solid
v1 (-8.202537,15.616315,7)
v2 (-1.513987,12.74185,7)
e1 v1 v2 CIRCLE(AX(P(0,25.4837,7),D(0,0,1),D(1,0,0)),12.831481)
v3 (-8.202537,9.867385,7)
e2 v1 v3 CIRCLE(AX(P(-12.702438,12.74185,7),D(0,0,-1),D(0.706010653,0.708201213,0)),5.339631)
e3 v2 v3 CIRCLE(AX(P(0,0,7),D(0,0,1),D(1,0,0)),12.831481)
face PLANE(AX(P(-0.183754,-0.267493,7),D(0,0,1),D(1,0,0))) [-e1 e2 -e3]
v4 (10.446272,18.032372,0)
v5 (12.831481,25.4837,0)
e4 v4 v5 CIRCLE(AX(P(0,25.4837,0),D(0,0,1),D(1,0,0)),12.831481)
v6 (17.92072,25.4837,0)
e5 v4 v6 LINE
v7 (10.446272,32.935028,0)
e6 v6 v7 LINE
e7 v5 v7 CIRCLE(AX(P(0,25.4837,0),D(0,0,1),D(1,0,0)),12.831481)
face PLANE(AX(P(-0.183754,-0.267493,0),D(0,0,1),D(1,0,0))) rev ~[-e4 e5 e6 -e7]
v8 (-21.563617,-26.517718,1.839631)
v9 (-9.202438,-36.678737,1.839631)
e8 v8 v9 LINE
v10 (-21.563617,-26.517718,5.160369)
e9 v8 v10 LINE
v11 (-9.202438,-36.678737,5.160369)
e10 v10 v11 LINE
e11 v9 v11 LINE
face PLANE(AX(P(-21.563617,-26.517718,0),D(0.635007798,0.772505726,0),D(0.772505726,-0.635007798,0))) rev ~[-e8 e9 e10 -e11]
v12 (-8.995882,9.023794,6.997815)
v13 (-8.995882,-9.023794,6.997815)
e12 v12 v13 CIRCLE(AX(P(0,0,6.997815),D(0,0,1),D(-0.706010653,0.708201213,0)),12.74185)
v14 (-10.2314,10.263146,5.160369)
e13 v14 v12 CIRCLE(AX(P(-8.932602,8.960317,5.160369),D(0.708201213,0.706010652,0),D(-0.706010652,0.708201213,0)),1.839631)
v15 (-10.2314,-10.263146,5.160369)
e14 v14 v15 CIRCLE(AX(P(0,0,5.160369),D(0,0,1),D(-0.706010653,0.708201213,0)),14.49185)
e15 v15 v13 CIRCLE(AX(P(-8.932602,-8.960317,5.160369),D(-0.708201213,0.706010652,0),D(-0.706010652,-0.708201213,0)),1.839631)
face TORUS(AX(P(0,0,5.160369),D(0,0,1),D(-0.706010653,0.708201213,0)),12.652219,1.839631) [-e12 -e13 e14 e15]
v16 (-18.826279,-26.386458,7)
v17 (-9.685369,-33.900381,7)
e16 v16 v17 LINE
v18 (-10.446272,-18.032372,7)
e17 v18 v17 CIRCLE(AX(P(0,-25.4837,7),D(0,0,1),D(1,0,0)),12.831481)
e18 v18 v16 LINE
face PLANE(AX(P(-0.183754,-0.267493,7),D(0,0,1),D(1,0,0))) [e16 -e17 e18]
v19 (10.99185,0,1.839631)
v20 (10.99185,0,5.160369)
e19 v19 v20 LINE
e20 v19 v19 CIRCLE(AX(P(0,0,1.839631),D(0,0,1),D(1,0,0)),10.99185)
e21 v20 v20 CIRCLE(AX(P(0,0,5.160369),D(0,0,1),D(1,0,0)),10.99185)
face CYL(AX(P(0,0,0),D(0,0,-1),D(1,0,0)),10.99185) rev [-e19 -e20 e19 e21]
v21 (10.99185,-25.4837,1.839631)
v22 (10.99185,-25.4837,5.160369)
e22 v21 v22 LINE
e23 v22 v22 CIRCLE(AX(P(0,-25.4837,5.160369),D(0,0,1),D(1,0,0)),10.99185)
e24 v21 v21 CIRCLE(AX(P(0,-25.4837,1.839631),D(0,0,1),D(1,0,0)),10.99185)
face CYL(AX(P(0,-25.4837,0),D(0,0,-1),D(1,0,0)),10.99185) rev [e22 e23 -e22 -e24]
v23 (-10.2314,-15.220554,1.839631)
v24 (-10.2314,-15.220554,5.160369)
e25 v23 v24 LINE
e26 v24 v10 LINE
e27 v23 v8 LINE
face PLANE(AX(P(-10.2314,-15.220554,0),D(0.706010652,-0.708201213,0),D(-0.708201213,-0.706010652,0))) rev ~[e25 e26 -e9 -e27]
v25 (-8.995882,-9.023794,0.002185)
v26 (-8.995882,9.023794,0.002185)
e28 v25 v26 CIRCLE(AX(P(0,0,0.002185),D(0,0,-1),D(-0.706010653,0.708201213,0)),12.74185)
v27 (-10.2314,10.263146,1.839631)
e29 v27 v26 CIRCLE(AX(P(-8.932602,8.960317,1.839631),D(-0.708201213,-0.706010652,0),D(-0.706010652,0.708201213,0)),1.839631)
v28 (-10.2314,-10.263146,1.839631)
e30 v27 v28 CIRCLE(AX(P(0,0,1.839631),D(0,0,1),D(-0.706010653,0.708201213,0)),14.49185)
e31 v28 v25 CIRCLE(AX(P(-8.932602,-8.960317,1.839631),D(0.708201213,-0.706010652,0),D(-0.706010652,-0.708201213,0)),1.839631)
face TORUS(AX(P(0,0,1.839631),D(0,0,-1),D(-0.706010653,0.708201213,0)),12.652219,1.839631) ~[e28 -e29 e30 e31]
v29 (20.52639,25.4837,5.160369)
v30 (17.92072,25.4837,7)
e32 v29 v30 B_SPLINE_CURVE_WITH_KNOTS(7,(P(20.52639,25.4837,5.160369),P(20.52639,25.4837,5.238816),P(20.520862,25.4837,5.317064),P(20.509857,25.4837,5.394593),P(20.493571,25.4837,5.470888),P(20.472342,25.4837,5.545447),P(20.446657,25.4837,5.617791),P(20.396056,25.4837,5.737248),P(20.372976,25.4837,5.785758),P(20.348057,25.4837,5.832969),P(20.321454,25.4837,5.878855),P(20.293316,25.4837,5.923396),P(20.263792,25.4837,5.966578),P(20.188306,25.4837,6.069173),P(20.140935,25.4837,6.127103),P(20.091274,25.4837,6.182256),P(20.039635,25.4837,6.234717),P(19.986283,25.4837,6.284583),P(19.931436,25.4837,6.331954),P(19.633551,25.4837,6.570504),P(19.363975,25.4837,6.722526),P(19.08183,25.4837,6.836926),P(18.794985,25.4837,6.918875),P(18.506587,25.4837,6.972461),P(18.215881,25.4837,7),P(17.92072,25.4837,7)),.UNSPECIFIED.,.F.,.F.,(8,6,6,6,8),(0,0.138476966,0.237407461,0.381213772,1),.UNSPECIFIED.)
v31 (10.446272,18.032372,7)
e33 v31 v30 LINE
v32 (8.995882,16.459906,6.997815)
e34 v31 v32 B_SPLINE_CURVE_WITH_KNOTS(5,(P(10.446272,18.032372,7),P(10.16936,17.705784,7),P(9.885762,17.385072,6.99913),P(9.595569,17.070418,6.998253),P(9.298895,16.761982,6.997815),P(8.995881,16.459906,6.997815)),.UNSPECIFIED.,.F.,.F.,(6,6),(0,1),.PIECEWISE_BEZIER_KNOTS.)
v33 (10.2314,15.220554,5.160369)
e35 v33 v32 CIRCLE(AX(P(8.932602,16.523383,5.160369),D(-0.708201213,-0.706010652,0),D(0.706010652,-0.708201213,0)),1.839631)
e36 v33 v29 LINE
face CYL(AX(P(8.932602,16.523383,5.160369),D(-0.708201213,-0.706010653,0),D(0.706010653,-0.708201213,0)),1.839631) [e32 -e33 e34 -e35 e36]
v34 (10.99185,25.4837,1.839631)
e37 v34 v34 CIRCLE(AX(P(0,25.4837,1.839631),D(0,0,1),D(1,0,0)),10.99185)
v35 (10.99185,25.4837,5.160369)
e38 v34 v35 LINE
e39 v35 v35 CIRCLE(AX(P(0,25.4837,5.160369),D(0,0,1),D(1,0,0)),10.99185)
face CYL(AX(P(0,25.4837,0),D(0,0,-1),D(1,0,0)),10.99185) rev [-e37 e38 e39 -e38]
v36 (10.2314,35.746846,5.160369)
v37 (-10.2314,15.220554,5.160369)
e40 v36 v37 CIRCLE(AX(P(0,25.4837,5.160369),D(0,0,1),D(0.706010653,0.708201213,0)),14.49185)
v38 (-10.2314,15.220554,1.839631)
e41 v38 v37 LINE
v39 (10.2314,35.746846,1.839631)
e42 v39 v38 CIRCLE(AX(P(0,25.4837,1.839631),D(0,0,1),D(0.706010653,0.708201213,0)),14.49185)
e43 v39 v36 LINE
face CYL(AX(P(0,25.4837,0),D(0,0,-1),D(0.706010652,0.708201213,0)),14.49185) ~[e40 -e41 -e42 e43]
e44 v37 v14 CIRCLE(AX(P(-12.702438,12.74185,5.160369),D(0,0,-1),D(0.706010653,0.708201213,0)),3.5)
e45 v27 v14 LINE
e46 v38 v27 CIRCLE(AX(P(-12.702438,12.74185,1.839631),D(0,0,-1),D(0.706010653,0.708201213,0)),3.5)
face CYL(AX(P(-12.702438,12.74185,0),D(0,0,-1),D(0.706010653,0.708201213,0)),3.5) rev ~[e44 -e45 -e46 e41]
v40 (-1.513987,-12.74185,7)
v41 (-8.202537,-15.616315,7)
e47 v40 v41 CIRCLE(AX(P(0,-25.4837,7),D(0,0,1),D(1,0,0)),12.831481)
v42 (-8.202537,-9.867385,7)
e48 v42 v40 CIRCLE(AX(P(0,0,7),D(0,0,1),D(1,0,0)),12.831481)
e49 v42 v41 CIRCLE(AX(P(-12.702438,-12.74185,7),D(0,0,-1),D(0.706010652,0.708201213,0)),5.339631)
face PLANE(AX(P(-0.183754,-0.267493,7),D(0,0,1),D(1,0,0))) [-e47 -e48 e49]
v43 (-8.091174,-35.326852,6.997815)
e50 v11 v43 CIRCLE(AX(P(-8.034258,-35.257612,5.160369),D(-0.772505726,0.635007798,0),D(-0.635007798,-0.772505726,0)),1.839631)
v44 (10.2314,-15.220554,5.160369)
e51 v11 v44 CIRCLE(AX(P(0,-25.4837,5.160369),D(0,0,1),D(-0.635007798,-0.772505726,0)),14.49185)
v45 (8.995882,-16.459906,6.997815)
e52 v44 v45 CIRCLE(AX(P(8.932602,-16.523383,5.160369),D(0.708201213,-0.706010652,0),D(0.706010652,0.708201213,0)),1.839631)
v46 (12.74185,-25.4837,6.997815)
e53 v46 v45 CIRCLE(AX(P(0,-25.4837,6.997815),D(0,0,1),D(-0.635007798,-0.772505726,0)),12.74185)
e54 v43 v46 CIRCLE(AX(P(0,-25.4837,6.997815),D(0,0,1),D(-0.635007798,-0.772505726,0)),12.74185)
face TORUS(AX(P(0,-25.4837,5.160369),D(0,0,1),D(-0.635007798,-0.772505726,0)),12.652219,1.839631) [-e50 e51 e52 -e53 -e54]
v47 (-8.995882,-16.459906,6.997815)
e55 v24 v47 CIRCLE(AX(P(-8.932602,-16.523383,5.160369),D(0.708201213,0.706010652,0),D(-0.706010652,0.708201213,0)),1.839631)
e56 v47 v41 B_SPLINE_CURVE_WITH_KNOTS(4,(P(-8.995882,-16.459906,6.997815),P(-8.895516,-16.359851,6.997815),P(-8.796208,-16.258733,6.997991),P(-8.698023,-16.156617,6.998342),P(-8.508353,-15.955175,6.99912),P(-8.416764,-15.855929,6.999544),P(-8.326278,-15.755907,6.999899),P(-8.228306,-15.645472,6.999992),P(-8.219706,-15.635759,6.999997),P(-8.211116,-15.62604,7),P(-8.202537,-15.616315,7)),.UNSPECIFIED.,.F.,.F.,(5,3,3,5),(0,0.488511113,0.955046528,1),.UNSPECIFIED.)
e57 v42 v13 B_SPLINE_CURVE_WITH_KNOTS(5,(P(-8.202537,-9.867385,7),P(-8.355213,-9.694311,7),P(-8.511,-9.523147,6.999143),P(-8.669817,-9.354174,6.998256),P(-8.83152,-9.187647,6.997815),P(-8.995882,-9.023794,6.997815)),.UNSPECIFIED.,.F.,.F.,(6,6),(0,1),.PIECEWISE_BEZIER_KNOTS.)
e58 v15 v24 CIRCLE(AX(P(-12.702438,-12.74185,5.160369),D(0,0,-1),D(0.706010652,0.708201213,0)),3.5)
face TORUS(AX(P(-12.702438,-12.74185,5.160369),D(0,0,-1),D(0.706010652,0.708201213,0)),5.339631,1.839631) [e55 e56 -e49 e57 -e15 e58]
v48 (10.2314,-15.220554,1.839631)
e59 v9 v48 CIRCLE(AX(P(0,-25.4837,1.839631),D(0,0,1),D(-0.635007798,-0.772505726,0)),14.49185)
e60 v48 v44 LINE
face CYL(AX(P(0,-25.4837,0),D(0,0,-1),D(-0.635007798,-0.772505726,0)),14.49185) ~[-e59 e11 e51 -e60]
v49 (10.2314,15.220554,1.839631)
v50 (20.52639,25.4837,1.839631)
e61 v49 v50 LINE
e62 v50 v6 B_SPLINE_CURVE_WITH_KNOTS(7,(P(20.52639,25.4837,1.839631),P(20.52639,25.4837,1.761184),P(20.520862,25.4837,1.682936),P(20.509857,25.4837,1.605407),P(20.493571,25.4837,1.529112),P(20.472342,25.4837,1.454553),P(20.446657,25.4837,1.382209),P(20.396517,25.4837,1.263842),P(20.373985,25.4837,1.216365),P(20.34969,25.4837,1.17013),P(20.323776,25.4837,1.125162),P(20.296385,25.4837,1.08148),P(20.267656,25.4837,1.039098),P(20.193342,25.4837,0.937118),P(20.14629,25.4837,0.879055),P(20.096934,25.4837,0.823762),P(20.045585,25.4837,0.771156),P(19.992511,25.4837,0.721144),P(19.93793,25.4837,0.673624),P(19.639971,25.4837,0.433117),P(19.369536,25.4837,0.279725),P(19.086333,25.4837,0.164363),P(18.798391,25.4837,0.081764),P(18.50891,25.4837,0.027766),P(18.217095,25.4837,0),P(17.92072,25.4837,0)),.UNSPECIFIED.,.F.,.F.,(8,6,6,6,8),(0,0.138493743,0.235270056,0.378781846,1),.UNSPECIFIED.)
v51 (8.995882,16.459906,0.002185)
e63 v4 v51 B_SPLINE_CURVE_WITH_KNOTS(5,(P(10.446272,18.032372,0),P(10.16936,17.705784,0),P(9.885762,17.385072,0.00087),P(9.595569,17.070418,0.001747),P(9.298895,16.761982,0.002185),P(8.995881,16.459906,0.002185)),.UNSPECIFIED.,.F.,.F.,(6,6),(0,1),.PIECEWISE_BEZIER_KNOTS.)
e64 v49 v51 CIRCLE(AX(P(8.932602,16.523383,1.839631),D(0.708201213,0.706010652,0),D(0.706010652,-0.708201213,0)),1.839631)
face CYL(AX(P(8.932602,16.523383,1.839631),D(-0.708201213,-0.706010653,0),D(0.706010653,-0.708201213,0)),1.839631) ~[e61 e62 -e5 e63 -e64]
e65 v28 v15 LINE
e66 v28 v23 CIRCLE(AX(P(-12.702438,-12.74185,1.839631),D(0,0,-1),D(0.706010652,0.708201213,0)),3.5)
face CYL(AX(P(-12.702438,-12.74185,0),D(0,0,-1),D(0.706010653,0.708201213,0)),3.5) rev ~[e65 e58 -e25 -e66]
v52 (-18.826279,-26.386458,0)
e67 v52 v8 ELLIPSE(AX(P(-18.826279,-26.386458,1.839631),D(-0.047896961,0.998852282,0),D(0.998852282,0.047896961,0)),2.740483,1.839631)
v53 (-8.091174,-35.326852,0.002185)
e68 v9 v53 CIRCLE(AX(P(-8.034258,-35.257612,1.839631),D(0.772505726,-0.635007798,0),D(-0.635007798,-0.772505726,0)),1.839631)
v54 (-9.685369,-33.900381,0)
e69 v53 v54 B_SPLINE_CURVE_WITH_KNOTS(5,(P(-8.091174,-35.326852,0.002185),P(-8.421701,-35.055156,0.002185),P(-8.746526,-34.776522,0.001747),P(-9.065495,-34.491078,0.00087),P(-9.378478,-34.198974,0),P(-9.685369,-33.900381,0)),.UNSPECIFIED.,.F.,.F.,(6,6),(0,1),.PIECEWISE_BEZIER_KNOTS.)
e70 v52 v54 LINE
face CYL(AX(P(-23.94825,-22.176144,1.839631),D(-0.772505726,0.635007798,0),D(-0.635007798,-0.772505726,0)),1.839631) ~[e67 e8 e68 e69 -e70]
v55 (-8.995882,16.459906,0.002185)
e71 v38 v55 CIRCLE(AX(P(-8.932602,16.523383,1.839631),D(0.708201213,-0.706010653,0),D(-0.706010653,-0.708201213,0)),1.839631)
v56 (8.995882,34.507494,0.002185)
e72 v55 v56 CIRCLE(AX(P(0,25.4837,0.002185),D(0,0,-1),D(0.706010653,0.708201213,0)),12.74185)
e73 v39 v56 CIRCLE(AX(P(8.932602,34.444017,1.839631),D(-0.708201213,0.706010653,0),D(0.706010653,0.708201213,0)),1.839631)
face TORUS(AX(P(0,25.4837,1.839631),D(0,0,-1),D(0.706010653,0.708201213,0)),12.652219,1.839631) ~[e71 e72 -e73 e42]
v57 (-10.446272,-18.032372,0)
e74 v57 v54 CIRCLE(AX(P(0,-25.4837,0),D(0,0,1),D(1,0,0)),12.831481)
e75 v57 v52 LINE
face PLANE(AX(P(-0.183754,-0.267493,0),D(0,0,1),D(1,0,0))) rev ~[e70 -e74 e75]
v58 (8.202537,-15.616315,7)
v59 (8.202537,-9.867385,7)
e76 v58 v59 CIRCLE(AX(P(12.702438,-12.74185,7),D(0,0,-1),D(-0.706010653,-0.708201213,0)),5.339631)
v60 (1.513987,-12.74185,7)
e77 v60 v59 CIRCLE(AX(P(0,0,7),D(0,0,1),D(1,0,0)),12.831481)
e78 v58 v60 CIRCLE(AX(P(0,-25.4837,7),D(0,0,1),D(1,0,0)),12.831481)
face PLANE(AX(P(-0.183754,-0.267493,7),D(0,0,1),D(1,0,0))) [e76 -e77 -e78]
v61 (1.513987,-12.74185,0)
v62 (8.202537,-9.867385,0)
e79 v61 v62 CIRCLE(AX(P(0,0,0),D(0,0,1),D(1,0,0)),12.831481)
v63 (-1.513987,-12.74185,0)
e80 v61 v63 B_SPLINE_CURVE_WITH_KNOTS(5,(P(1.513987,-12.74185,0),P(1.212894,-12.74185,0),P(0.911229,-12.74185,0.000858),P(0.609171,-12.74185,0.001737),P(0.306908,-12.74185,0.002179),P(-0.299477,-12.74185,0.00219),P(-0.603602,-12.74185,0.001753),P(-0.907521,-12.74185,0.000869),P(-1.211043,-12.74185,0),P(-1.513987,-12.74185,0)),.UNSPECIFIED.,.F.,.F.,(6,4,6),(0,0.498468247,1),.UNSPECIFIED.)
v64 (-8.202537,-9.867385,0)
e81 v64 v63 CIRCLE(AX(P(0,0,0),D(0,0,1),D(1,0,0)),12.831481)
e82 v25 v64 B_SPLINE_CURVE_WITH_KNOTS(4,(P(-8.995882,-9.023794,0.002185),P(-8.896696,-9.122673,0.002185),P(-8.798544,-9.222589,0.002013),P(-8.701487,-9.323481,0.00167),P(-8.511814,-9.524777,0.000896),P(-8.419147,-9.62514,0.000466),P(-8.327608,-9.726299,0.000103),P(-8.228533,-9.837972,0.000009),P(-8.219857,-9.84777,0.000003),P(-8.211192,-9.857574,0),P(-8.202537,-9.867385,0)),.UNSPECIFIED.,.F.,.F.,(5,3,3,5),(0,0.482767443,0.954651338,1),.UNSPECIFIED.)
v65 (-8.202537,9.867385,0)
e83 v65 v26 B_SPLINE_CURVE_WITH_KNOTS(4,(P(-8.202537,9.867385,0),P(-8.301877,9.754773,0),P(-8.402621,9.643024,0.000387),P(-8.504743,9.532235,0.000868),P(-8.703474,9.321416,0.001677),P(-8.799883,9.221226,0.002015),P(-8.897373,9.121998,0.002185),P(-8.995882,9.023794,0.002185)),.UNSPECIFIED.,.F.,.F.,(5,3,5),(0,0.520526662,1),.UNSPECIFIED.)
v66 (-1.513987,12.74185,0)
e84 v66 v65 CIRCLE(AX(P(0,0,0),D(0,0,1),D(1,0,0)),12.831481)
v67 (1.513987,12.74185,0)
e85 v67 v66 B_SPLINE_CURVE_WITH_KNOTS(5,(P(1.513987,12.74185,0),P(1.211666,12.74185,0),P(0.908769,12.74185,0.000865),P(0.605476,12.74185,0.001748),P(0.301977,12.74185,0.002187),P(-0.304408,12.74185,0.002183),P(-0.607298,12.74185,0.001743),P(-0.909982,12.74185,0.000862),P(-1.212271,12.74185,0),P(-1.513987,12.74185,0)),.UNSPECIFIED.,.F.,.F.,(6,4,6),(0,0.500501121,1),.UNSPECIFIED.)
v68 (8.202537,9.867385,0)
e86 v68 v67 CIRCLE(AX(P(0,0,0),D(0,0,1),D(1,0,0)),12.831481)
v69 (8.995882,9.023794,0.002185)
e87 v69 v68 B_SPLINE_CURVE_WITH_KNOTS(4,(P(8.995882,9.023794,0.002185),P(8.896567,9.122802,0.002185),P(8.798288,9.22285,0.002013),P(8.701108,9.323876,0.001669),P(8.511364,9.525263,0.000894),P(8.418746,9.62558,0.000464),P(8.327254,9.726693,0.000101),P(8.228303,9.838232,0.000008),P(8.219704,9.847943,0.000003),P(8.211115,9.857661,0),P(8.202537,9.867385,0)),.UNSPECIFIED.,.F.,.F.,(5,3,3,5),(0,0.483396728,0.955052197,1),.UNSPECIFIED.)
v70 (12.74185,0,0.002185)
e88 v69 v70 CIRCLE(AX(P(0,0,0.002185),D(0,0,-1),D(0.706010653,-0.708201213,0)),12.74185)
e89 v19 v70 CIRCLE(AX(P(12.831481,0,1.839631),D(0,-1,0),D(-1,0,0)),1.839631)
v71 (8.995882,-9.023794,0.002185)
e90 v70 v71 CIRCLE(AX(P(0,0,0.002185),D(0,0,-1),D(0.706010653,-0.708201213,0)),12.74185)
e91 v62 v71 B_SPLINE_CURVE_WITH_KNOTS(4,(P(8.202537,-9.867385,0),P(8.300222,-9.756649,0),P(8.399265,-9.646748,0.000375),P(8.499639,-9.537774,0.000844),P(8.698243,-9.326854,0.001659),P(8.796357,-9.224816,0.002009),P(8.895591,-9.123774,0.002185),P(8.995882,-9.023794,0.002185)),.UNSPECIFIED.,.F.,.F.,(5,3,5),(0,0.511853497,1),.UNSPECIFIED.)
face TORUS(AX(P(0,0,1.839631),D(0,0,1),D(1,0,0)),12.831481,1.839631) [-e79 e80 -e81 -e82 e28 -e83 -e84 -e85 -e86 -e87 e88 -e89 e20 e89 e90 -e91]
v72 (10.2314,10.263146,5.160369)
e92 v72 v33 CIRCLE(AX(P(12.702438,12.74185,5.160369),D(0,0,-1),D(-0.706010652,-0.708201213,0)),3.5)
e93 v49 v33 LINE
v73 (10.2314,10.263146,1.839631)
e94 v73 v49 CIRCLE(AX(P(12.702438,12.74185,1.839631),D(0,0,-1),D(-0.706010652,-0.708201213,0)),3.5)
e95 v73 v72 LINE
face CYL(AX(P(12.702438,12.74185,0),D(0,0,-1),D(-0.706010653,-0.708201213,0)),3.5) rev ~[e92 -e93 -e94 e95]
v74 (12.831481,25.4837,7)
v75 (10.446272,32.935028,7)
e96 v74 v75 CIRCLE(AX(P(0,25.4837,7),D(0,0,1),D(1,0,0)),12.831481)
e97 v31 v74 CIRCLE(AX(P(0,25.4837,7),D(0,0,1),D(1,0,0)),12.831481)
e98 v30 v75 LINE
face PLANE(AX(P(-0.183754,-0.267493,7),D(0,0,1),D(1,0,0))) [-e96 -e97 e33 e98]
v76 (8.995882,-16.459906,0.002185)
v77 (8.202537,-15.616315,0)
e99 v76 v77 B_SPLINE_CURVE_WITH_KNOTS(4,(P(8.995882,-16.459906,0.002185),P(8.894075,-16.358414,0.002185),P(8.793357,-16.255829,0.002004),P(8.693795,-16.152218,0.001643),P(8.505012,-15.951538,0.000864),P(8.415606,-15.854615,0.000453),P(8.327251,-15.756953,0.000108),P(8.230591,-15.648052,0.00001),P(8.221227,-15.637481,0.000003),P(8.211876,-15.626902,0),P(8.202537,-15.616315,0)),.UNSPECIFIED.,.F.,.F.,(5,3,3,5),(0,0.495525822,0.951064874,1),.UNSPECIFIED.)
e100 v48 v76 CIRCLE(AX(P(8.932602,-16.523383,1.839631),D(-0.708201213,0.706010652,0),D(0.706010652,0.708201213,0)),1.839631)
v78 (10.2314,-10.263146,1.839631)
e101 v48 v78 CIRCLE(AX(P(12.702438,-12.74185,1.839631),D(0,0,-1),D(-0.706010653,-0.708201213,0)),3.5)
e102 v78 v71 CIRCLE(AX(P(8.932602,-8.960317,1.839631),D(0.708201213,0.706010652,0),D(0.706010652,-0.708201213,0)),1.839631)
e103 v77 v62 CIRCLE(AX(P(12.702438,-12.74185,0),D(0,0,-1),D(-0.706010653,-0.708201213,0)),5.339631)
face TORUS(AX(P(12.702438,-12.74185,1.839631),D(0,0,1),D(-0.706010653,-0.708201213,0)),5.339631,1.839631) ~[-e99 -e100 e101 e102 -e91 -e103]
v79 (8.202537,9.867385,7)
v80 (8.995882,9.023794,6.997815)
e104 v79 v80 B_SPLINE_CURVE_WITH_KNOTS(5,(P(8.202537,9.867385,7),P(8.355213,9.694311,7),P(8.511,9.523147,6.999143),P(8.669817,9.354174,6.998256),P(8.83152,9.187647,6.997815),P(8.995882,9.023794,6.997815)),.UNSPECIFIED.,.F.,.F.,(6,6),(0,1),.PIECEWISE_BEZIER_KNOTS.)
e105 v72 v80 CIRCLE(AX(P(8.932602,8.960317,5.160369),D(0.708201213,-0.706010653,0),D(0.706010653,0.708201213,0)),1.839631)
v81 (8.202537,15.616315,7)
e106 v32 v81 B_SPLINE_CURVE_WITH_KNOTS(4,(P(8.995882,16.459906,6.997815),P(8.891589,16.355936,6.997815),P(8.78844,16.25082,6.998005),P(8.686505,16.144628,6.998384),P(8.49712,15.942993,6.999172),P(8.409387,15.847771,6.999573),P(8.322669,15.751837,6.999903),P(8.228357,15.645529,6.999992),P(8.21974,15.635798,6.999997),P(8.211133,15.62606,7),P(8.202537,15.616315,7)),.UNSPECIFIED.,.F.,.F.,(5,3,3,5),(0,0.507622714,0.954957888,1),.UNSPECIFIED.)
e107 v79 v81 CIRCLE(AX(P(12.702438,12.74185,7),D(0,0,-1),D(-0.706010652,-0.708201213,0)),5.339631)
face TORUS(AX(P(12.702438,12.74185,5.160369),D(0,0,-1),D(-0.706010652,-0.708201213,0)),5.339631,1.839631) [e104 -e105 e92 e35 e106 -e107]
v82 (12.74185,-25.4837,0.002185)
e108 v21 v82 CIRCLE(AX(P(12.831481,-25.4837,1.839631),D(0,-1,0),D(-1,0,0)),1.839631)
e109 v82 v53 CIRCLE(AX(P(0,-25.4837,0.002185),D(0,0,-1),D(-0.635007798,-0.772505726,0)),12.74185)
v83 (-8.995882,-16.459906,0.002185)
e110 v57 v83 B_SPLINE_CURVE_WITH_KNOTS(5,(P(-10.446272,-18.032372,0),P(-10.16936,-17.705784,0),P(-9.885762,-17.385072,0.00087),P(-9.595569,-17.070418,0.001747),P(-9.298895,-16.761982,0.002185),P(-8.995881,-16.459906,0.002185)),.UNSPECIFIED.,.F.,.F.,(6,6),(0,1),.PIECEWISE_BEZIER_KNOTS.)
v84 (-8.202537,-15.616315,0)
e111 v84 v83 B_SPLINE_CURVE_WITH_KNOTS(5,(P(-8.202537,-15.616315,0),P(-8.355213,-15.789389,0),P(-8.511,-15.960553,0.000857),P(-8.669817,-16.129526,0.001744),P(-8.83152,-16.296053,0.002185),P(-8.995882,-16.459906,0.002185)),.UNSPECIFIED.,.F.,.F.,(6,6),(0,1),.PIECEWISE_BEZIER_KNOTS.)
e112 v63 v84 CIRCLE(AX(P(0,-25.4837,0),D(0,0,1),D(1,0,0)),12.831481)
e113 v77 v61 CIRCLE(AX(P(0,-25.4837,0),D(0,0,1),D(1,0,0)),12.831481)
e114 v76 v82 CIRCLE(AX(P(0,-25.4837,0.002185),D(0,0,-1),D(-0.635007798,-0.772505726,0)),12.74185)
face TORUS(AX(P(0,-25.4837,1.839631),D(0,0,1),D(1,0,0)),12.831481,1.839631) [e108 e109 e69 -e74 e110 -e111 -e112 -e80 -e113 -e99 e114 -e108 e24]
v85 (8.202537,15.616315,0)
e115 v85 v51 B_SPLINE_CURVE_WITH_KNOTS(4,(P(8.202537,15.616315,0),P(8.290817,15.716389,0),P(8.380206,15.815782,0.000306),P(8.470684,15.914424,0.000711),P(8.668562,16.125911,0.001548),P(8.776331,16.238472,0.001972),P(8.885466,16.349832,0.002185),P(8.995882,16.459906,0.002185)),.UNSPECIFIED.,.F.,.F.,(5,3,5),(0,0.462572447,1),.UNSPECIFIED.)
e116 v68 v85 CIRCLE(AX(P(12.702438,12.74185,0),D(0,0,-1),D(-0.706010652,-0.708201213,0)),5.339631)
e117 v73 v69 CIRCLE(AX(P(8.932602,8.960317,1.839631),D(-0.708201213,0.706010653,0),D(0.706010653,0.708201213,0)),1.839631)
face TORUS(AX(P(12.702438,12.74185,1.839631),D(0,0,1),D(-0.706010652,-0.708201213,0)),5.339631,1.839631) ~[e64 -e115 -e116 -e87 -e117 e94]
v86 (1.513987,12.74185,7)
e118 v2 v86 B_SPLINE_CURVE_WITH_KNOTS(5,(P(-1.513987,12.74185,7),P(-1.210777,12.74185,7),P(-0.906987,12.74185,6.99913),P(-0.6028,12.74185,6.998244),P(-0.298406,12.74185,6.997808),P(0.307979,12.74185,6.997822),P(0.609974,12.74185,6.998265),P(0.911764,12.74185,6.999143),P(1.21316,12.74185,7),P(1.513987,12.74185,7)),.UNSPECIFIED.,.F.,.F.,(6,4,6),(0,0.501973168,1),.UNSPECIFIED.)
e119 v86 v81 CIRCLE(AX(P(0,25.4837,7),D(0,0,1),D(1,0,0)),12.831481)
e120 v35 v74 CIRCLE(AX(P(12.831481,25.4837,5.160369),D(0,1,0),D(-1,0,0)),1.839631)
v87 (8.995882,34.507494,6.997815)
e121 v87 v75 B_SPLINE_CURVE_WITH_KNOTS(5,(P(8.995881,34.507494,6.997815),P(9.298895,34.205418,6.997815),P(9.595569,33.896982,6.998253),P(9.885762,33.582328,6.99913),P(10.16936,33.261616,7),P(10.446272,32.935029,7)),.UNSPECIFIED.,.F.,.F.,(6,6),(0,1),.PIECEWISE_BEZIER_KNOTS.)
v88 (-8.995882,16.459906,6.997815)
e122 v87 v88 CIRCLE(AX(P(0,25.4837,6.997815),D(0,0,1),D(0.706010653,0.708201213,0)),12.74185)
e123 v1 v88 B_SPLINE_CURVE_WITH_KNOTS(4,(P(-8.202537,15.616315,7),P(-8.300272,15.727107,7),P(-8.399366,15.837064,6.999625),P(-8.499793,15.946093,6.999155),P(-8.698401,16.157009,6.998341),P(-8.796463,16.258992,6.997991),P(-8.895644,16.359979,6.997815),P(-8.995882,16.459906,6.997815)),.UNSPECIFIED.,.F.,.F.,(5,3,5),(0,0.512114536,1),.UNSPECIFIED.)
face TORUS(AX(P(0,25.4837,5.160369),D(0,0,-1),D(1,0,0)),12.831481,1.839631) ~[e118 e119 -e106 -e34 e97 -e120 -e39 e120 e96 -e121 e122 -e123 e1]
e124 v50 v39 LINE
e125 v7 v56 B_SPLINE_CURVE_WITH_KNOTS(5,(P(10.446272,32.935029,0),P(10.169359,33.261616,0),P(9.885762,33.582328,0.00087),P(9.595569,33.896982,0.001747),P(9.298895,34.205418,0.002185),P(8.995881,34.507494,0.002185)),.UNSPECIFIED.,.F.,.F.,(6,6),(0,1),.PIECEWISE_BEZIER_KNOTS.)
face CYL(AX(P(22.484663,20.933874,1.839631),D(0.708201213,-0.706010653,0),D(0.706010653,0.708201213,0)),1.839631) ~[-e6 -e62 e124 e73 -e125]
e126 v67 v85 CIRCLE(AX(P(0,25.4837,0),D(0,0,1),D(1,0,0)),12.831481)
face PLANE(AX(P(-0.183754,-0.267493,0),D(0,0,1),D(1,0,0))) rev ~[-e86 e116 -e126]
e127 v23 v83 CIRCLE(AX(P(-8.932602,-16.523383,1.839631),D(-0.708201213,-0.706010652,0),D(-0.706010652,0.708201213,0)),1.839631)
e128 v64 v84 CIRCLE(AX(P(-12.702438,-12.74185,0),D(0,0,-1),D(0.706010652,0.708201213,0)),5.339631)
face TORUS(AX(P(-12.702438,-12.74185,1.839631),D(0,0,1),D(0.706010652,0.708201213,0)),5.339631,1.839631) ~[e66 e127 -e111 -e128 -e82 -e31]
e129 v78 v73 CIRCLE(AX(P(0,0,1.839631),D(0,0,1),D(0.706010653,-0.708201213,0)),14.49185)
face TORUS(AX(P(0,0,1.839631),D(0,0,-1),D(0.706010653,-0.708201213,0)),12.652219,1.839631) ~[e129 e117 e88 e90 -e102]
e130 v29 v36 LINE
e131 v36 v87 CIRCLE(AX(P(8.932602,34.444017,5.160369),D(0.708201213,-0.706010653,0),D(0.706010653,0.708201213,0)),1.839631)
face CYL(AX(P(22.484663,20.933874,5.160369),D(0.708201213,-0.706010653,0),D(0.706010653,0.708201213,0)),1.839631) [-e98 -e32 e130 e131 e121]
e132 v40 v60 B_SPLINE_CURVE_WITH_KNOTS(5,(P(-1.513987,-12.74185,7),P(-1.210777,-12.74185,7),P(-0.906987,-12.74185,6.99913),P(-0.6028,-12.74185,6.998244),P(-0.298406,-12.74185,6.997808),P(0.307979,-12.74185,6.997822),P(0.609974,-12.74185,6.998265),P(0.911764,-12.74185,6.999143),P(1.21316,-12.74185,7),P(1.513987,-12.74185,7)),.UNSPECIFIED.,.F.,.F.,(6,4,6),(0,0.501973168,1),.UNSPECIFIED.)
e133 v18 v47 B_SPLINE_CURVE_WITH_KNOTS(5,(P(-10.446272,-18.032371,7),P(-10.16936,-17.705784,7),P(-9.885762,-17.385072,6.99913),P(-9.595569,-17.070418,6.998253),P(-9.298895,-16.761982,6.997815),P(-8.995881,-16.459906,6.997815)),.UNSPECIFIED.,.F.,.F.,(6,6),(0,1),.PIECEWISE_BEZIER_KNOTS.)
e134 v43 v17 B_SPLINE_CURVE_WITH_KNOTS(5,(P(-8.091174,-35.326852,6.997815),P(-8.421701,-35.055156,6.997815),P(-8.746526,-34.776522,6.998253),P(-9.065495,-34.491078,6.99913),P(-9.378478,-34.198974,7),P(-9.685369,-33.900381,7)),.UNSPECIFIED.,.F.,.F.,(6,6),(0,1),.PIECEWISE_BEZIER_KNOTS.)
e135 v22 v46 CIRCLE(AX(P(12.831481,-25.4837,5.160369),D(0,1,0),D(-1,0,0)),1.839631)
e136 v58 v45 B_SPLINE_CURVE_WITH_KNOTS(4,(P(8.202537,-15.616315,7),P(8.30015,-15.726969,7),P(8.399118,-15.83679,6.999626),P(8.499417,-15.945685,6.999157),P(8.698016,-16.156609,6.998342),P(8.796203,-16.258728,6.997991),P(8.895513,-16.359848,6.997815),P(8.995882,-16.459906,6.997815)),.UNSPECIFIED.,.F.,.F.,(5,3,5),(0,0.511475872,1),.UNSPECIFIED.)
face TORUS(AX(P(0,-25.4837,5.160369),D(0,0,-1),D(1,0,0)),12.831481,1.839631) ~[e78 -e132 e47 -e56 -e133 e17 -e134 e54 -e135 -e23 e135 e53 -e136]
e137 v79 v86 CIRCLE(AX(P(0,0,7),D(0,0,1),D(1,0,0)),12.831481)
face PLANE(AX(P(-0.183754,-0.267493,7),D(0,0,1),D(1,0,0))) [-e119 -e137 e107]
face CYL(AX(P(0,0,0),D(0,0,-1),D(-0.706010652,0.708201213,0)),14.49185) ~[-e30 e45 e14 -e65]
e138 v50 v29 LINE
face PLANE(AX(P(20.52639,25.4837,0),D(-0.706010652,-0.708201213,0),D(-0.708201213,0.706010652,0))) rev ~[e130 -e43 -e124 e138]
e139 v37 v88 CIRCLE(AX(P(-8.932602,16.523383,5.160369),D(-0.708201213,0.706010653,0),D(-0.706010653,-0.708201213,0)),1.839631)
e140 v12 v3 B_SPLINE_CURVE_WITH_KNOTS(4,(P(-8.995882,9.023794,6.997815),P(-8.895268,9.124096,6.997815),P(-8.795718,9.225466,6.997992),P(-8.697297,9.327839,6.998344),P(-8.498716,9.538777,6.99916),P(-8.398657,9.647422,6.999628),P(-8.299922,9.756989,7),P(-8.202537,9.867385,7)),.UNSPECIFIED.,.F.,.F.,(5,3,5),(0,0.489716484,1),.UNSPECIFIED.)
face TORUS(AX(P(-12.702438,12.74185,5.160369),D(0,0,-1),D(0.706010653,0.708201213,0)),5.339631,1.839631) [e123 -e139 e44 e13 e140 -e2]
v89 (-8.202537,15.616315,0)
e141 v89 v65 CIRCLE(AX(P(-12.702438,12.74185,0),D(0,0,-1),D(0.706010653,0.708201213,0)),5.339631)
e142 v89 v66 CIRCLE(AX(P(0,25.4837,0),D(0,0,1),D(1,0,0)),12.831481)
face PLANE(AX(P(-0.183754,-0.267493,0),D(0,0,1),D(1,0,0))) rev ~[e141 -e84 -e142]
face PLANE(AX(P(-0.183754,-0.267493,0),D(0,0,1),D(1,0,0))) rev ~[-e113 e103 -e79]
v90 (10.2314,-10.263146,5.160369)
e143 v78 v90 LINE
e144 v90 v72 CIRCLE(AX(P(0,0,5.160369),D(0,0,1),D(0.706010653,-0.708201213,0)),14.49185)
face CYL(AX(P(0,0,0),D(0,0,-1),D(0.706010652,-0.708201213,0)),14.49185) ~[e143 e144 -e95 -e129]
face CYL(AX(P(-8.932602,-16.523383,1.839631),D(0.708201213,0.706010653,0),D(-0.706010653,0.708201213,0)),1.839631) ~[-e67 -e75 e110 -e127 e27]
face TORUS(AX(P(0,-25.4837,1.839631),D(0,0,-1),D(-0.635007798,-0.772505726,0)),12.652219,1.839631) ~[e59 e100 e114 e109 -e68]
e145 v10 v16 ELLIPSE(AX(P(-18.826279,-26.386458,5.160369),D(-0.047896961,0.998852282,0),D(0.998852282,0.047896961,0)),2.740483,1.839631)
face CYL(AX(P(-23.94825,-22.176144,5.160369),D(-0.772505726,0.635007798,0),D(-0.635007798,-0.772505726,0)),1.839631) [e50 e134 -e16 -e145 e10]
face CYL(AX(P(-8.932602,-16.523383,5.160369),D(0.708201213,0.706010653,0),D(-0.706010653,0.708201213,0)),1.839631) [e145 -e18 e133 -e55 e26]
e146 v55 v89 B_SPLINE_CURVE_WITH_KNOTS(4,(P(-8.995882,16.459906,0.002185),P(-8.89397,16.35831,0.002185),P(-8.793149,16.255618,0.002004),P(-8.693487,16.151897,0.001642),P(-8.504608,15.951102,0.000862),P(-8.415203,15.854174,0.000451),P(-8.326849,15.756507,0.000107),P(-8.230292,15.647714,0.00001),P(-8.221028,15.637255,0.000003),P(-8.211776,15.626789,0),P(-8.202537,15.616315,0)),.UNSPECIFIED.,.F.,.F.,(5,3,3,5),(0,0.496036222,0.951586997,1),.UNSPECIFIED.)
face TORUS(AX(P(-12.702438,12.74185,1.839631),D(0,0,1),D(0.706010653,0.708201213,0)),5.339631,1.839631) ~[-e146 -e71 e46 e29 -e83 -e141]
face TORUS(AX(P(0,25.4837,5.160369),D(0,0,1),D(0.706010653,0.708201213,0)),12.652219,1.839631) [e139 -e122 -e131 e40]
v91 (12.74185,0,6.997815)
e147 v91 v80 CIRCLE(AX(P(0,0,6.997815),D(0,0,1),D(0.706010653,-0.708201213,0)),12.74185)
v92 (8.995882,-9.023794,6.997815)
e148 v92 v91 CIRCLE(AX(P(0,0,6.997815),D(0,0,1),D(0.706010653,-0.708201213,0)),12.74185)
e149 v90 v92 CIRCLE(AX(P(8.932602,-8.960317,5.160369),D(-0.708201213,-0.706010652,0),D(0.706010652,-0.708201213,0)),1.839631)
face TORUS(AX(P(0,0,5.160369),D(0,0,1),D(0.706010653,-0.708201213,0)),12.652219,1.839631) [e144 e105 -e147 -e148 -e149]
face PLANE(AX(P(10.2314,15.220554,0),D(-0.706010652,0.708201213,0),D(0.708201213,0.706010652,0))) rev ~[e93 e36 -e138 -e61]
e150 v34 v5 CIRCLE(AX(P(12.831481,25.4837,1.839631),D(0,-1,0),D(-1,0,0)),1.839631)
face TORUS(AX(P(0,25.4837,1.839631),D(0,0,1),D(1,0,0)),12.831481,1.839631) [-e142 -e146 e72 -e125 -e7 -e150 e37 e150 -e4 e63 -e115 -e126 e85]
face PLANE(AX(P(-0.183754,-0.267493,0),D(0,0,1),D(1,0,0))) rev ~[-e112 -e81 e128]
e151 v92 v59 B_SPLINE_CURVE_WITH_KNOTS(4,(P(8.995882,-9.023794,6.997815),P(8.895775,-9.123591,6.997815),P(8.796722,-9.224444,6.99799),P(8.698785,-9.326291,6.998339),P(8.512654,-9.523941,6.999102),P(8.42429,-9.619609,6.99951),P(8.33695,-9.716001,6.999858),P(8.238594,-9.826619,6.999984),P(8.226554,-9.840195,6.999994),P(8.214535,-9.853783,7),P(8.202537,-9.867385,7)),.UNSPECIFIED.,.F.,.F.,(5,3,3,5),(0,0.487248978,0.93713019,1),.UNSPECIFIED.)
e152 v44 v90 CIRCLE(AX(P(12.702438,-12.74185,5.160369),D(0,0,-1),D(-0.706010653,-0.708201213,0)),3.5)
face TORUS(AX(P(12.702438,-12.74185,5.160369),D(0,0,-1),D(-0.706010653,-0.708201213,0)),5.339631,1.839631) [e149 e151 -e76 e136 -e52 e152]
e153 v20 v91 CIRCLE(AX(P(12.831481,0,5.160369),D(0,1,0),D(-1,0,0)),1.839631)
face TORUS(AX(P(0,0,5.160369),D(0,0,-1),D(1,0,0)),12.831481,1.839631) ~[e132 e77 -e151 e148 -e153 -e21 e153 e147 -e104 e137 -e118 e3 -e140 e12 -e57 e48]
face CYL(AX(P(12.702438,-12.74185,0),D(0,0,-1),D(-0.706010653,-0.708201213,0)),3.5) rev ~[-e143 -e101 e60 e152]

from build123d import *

# Parameters (mm, degrees)
F1_R         = 10.99185
F2_DEPTH     = 7
F3_T3_ANGLE  = 174.5093117662
F3_T6_ANGLE  = 90.1774978599
F3_T9_DEPTH  = 19.1358911422
F3_T12_DEPTH = 19.1358911422
F3_T15_ANGLE = 180
F3_T18_ANGLE = 90.1774978599
F3_T21_ANGLE = 90.1774978599
F3_T24_ANGLE = 90.1774978599
F3_T27_DEPTH = 20.6004844584
F3_T30_DEPTH = 20.6004844584
F3_T33_ANGLE = 90.1774978599
F3_T36_ANGLE = 90.1774978599
F3_T48_ANGLE = 90.1774978599
F3_T51_DEPTH = 19.1358911422
F3_T54_DEPTH = 19.1358911422
F3_T57_ANGLE = 180
F3_T60_ANGLE = 90.1774978599
F3_T63_ANGLE = 90.1774978599
F3_T66_ANGLE = 90.1774978599
F3_T69_DEPTH = 20.6004844584
F3_T72_DEPTH = 20.6004844584
F3_T75_ANGLE = 174.5093117662
F3_T78_ANGLE = 90.1774978599
F3_T81_ANGLE = 90.1774978599


# Not quite as in the source:
# - a fillet or chamfer that OpenCascade refuses, or shapes differently, is made with other operations: its cross-section is extruded or revolved along the edge and cut away or added


with BuildPart() as f2:
    # F1 (on Top) → F2 (new body)
    with BuildSketch(Plane.XY):
        with BuildLine():
            Line((20.5263900038, 25.4837), (10.2314004744, 35.7468457534))
            ThreePointArc((10.2314004744, 35.7468457534), (-10.2631457534, 35.7151004744), (-10.2314004744, 15.2205542466))
            ThreePointArc((-10.2314004744, 15.2205542466), (-9.2024377582, 12.74185), (-10.2314004744, 10.2631457534))
            ThreePointArc((-10.2314004744, 10.2631457534), (-14.49185, 0), (-10.2314004744, -10.2631457534))
            ThreePointArc((-10.2314004744, -10.2631457534), (-9.2024377582, -12.74185), (-10.2314004744, -15.2205542466))
            Line((-10.2314004744, -15.2205542466), (-21.5636167673, -26.5177184828))
            Line((-21.5636167673, -26.5177184828), (-9.2024377582, -36.6787371026))
            ThreePointArc((-9.2024377582, -36.6787371026), (10.7414195495, -35.2117842145), (10.2314004744, -15.2205542466))
            ThreePointArc((10.2314004744, -15.2205542466), (9.2024377582, -12.74185), (10.2314004744, -10.2631457534))
            ThreePointArc((10.2314004744, -10.2631457534), (14.49185, 0), (10.2314004744, 10.2631457534))
            ThreePointArc((10.2314004744, 10.2631457534), (9.2024377582, 12.74185), (10.2314004744, 15.2205542466))
            Line((10.2314004744, 15.2205542466), (20.5263900038, 25.4837))
        make_face()
        with Locations((0, -25.4837)):
            Circle(F1_R, mode=Mode.SUBTRACT)
        Circle(F1_R, mode=Mode.SUBTRACT)
        with Locations((0, 25.4837)):
            Circle(F1_R, mode=Mode.SUBTRACT)
    extrude(amount=F2_DEPTH)

    # F3: fillet of radius 1.8396307345 on 30 edges, made by hand


with BuildPart() as f3_tool1:
    # F3_s2 → F3_t3 (revolve)
    with BuildSketch(Plane(origin=(12.5009566595, -10.2759173125, 0), x_dir=(0, 0, 1), z_dir=(-0.7725057258, 0.635007798, 0))):
        with BuildLine():
            ThreePointArc((5.1603692655, -34.1781541649), (6.4611846327, -33.6393387977), (7, -32.3385234304))
            Line((7, -32.3385234304), (7, -34.1781541649))
            Line((7, -34.1781541649), (5.1603692655, -34.1781541649))
        make_face()
    revolve(axis=Axis((0, -25.4837, 7), (0, 0, 1)), revolution_arc=F3_T3_ANGLE)


with BuildPart() as f3_tool4:
    # F3_s5 → F3_t6 (revolve)
    with BuildSketch(Plane(origin=(0, 0, 0), x_dir=(0, 0, 1), z_dir=(0.7082012133, -0.7060106525, 0))):
        with BuildLine():
            ThreePointArc((5.1603692655, -14.49185), (6.4611846327, -13.9530346327), (7, -12.6522192655))
            Line((7, -12.6522192655), (7, -14.49185))
            Line((7, -14.49185), (5.1603692655, -14.49185))
        make_face()
    revolve(axis=Axis((12.7024377582, 12.74185, 7), (0, 0, -1)), revolution_arc=F3_T6_ANGLE)


with BuildPart() as f3_tool7:
    # F3_s8 → F3_t9 (new body)
    with BuildSketch(Plane(origin=(12.7417888575, 12.7023768048, 0), x_dir=(0, 0, 1), z_dir=(0.7082012133, 0.7060106525, 0))):
        with BuildLine():
            ThreePointArc((5.1603692655, -3.5557372601), (6.4611846327, -4.0945526273), (7, -5.3953679946))
            Line((7, -5.3953679946), (7, -3.5557372601))
            Line((7, -3.5557372601), (5.1603692655, -3.5557372601))
        make_face()
    extrude(amount=F3_T9_DEPTH)


with BuildPart() as f3_tool10:
    # F3_s11 → F3_t12 (new body)
    with BuildSketch(Plane(origin=(0.8102724675, -0.8077661867, 0), x_dir=(0, 0, 1), z_dir=(-0.7082012133, 0.7060106525, 0))):
        with BuildLine():
            ThreePointArc((5.1603692655, 32.5394372601), (6.4611846327, 32.0006218928), (7, 30.6998065255))
            Line((7, 30.6998065255), (7, 32.5394372601))
            Line((7, 32.5394372601), (5.1603692655, 32.5394372601))
        make_face()
    extrude(amount=F3_T12_DEPTH)


with BuildPart() as f3_tool13:
    # F3_s14 → F3_t15 (revolve)
    with BuildSketch(Plane(origin=(-12.7417888575, 12.7023768048, 0), x_dir=(0, 0, 1), z_dir=(0.7082012133, -0.7060106525, 0))):
        with BuildLine():
            ThreePointArc((5.1603692655, -32.5394372601), (6.4611846327, -32.0006218928), (7, -30.6998065255))
            Line((7, -30.6998065255), (7, -32.5394372601))
            Line((7, -32.5394372601), (5.1603692655, -32.5394372601))
        make_face()
    revolve(axis=Axis((0, 25.4837, 7), (0, 0, 1)), revolution_arc=F3_T15_ANGLE)


with BuildPart() as f3_tool16:
    # F3_s17 → F3_t18 (revolve)
    with BuildSketch(Plane(origin=(-12.7417888575, 12.7023768048, 0), x_dir=(0, 0, 1), z_dir=(-0.7082012133, 0.7060106525, 0))):
        with BuildLine():
            ThreePointArc((5.1603692655, 3.5557372601), (6.4611846327, 4.0945526273), (7, 5.3953679946))
            Line((7, 5.3953679946), (7, 3.5557372601))
            Line((7, 3.5557372601), (5.1603692655, 3.5557372601))
        make_face()
    revolve(axis=Axis((-12.7024377582, 12.74185, 7), (0, 0, -1)), revolution_arc=F3_T18_ANGLE)


with BuildPart() as f3_tool19:
    # F3_s20 → F3_t21 (revolve)
    with BuildSketch(Plane(origin=(0, 0, 0), x_dir=(0, 0, 1), z_dir=(0.7082012133, 0.7060106525, 0))):
        with BuildLine():
            ThreePointArc((5.1603692655, -14.49185), (6.4611846327, -13.9530346327), (7, -12.6522192655))
            Line((7, -12.6522192655), (7, -14.49185))
            Line((7, -14.49185), (5.1603692655, -14.49185))
        make_face()
    revolve(axis=Axis((0, 0, 7), (0, 0, 1)), revolution_arc=F3_T21_ANGLE)


with BuildPart() as f3_tool22:
    # F3_s23 → F3_t24 (revolve)
    with BuildSketch(Plane(origin=(0, 0, 0), x_dir=(0, 0, 1), z_dir=(-0.7082012133, 0.7060106525, 0))):
        with BuildLine():
            ThreePointArc((5.1603692655, -14.49185), (6.4611846327, -13.9530346327), (7, -12.6522192655))
            Line((7, -12.6522192655), (7, -14.49185))
            Line((7, -14.49185), (5.1603692655, -14.49185))
        make_face()
    revolve(axis=Axis((-12.7024377582, -12.74185, 7), (0, 0, -1)), revolution_arc=F3_T24_ANGLE)


with BuildPart() as f3_tool25:
    # F3_s26 → F3_t27 (new body)
    with BuildSketch(Plane(origin=(-12.7417888575, -12.7023768048, 0), x_dir=(0, 0, 1), z_dir=(-0.7082012133, -0.7060106525, 0))):
        with BuildLine():
            ThreePointArc((5.1603692655, -3.5557372601), (6.4611846327, -4.0945526273), (7, -5.3953679946))
            Line((7, -5.3953679946), (7, -3.5557372601))
            Line((7, -3.5557372601), (5.1603692655, -3.5557372601))
        make_face()
    extrude(amount=F3_T27_DEPTH)


with BuildPart() as f3_tool28:
    # F3_s29 → F3_t30 (new body)
    with BuildSketch(Plane(origin=(-3.4130355392, 2.8055509622, 0), x_dir=(0, 0, 1), z_dir=(0.7725057258, -0.635007798, 0))):
        with BuildLine():
            ThreePointArc((5.1603692655, 34.1781541649), (6.4611846327, 33.6393387977), (7, 32.3385234304))
            Line((7, 32.3385234304), (7, 34.1781541649))
            Line((7, 34.1781541649), (5.1603692655, 34.1781541649))
        make_face()
    extrude(amount=F3_T30_DEPTH)


with BuildPart() as f3_tool31:
    # F3_s32 → F3_t33 (revolve)
    with BuildSketch(Plane(origin=(12.7417888575, -12.7023768048, 0), x_dir=(0, 0, 1), z_dir=(0.7082012133, -0.7060106525, 0))):
        with BuildLine():
            ThreePointArc((5.1603692655, 3.5557372601), (6.4611846327, 4.0945526273), (7, 5.3953679946))
            Line((7, 5.3953679946), (7, 3.5557372601))
            Line((7, 3.5557372601), (5.1603692655, 3.5557372601))
        make_face()
    revolve(axis=Axis((12.7024377582, -12.74185, 7), (0, 0, -1)), revolution_arc=F3_T33_ANGLE)


with BuildPart() as f3_tool34:
    # F3_s35 → F3_t36 (revolve)
    with BuildSketch(Plane(origin=(0, 0, 0), x_dir=(0, 0, 1), z_dir=(-0.7082012133, -0.7060106525, 0))):
        with BuildLine():
            ThreePointArc((5.1603692655, -14.49185), (6.4611846327, -13.9530346327), (7, -12.6522192655))
            Line((7, -12.6522192655), (7, -14.49185))
            Line((7, -14.49185), (5.1603692655, -14.49185))
        make_face()
    revolve(axis=Axis((0, 0, 7), (0, 0, 1)), revolution_arc=F3_T36_ANGLE)


with BuildPart() as f3_tool37:
    # F3_s38 → F3_t39 (revolve)
    with BuildSketch(Plane.XZ.offset(25.4837)):
        with BuildLine():
            ThreePointArc((10.99185, 5.1603692655), (11.5306653673, 6.4611846327), (12.8314807345, 7))
            Line((12.8314807345, 7), (10.99185, 7))
            Line((10.99185, 7), (10.99185, 5.1603692655))
        make_face()
    revolve(axis=Axis((0, -25.4837, 7), (0, 0, 1)))


with BuildPart() as f3_tool40:
    # F3_s41 → F3_t42 (revolve)
    with BuildSketch(Plane.XZ):
        with BuildLine():
            ThreePointArc((10.99185, 5.1603692655), (11.5306653673, 6.4611846327), (12.8314807345, 7))
            Line((12.8314807345, 7), (10.99185, 7))
            Line((10.99185, 7), (10.99185, 5.1603692655))
        make_face()
    revolve(axis=Axis((0, 0, 7), (0, 0, 1)))


with BuildPart() as f3_tool43:
    # F3_s44 → F3_t45 (revolve)
    with BuildSketch(Plane.XZ.offset(-25.4837)):
        with BuildLine():
            ThreePointArc((10.99185, 5.1603692655), (11.5306653673, 6.4611846327), (12.8314807345, 7))
            Line((12.8314807345, 7), (10.99185, 7))
            Line((10.99185, 7), (10.99185, 5.1603692655))
        make_face()
    revolve(axis=Axis((0, 25.4837, 7), (0, 0, 1)))


with BuildPart() as f3_tool46:
    # F3_s47 → F3_t48 (revolve)
    with BuildSketch(Plane(origin=(0, 0, 0), x_dir=(0, 0, 1), z_dir=(0.7082012133, -0.7060106525, 0))):
        with BuildLine():
            ThreePointArc((1.8396307345, -14.49185), (0.5388153673, -13.9530346327), (0, -12.6522192655))
            Line((0, -12.6522192655), (0, -14.49185))
            Line((0, -14.49185), (1.8396307345, -14.49185))
        make_face()
    revolve(axis=Axis((12.7024377582, 12.74185, 0), (0, 0, -1)), revolution_arc=F3_T48_ANGLE)


with BuildPart() as f3_tool49:
    # F3_s50 → F3_t51 (new body)
    with BuildSketch(Plane(origin=(12.7417888575, 12.7023768048, 0), x_dir=(0, 0, 1), z_dir=(0.7082012133, 0.7060106525, 0))):
        with BuildLine():
            ThreePointArc((1.8396307345, -3.5557372601), (0.5388153673, -4.0945526273), (0, -5.3953679946))
            Line((0, -5.3953679946), (0, -3.5557372601))
            Line((0, -3.5557372601), (1.8396307345, -3.5557372601))
        make_face()
    extrude(amount=F3_T51_DEPTH)


with BuildPart() as f3_tool52:
    # F3_s53 → F3_t54 (new body)
    with BuildSketch(Plane(origin=(0.8102724675, -0.8077661867, 0), x_dir=(0, 0, 1), z_dir=(-0.7082012133, 0.7060106525, 0))):
        with BuildLine():
            ThreePointArc((1.8396307345, 32.5394372601), (0.5388153673, 32.0006218928), (0, 30.6998065255))
            Line((0, 30.6998065255), (0, 32.5394372601))
            Line((0, 32.5394372601), (1.8396307345, 32.5394372601))
        make_face()
    extrude(amount=F3_T54_DEPTH)


with BuildPart() as f3_tool55:
    # F3_s56 → F3_t57 (revolve)
    with BuildSketch(Plane(origin=(-12.7417888575, 12.7023768048, 0), x_dir=(0, 0, 1), z_dir=(0.7082012133, -0.7060106525, 0))):
        with BuildLine():
            ThreePointArc((1.8396307345, -32.5394372601), (0.5388153673, -32.0006218928), (0, -30.6998065255))
            Line((0, -30.6998065255), (0, -32.5394372601))
            Line((0, -32.5394372601), (1.8396307345, -32.5394372601))
        make_face()
    revolve(axis=Axis((0, 25.4837, 0), (0, 0, 1)), revolution_arc=F3_T57_ANGLE)


with BuildPart() as f3_tool58:
    # F3_s59 → F3_t60 (revolve)
    with BuildSketch(Plane(origin=(-12.7417888575, 12.7023768048, 0), x_dir=(0, 0, 1), z_dir=(-0.7082012133, 0.7060106525, 0))):
        with BuildLine():
            ThreePointArc((1.8396307345, 3.5557372601), (0.5388153673, 4.0945526273), (0, 5.3953679946))
            Line((0, 5.3953679946), (0, 3.5557372601))
            Line((0, 3.5557372601), (1.8396307345, 3.5557372601))
        make_face()
    revolve(axis=Axis((-12.7024377582, 12.74185, 0), (0, 0, -1)), revolution_arc=F3_T60_ANGLE)


with BuildPart() as f3_tool61:
    # F3_s62 → F3_t63 (revolve)
    with BuildSketch(Plane(origin=(0, 0, 0), x_dir=(0, 0, 1), z_dir=(0.7082012133, 0.7060106525, 0))):
        with BuildLine():
            ThreePointArc((1.8396307345, -14.49185), (0.5388153673, -13.9530346327), (0, -12.6522192655))
            Line((0, -12.6522192655), (0, -14.49185))
            Line((0, -14.49185), (1.8396307345, -14.49185))
        make_face()
    revolve(axis=Axis((0, 0, 0), (0, 0, 1)), revolution_arc=F3_T63_ANGLE)


with BuildPart() as f3_tool64:
    # F3_s65 → F3_t66 (revolve)
    with BuildSketch(Plane(origin=(0, 0, 0), x_dir=(0, 0, 1), z_dir=(-0.7082012133, 0.7060106525, 0))):
        with BuildLine():
            ThreePointArc((1.8396307345, -14.49185), (0.5388153673, -13.9530346327), (0, -12.6522192655))
            Line((0, -12.6522192655), (0, -14.49185))
            Line((0, -14.49185), (1.8396307345, -14.49185))
        make_face()
    revolve(axis=Axis((-12.7024377582, -12.74185, 0), (0, 0, -1)), revolution_arc=F3_T66_ANGLE)


with BuildPart() as f3_tool67:
    # F3_s68 → F3_t69 (new body)
    with BuildSketch(Plane(origin=(-12.7417888575, -12.7023768048, 0), x_dir=(0, 0, 1), z_dir=(-0.7082012133, -0.7060106525, 0))):
        with BuildLine():
            ThreePointArc((1.8396307345, -3.5557372601), (0.5388153673, -4.0945526273), (0, -5.3953679946))
            Line((0, -5.3953679946), (0, -3.5557372601))
            Line((0, -3.5557372601), (1.8396307345, -3.5557372601))
        make_face()
    extrude(amount=F3_T69_DEPTH)


with BuildPart() as f3_tool70:
    # F3_s71 → F3_t72 (new body)
    with BuildSketch(Plane(origin=(-3.4130355392, 2.8055509622, 0), x_dir=(0, 0, 1), z_dir=(0.7725057258, -0.635007798, 0))):
        with BuildLine():
            ThreePointArc((1.8396307345, 34.1781541649), (0.5388153673, 33.6393387977), (0, 32.3385234304))
            Line((0, 32.3385234304), (0, 34.1781541649))
            Line((0, 34.1781541649), (1.8396307345, 34.1781541649))
        make_face()
    extrude(amount=F3_T72_DEPTH)


with BuildPart() as f3_tool73:
    # F3_s74 → F3_t75 (revolve)
    with BuildSketch(Plane(origin=(12.5009566595, -10.2759173125, 0), x_dir=(0, 0, 1), z_dir=(-0.7725057258, 0.635007798, 0))):
        with BuildLine():
            ThreePointArc((1.8396307345, -34.1781541649), (0.5388153673, -33.6393387977), (0, -32.3385234304))
            Line((0, -32.3385234304), (0, -34.1781541649))
            Line((0, -34.1781541649), (1.8396307345, -34.1781541649))
        make_face()
    revolve(axis=Axis((0, -25.4837, 0), (0, 0, 1)), revolution_arc=F3_T75_ANGLE)


with BuildPart() as f3_tool76:
    # F3_s77 → F3_t78 (revolve)
    with BuildSketch(Plane(origin=(12.7417888575, -12.7023768048, 0), x_dir=(0, 0, 1), z_dir=(0.7082012133, -0.7060106525, 0))):
        with BuildLine():
            ThreePointArc((1.8396307345, 3.5557372601), (0.5388153673, 4.0945526273), (0, 5.3953679946))
            Line((0, 5.3953679946), (0, 3.5557372601))
            Line((0, 3.5557372601), (1.8396307345, 3.5557372601))
        make_face()
    revolve(axis=Axis((12.7024377582, -12.74185, 0), (0, 0, -1)), revolution_arc=F3_T78_ANGLE)


with BuildPart() as f3_tool79:
    # F3_s80 → F3_t81 (revolve)
    with BuildSketch(Plane(origin=(0, 0, 0), x_dir=(0, 0, 1), z_dir=(-0.7082012133, -0.7060106525, 0))):
        with BuildLine():
            ThreePointArc((1.8396307345, -14.49185), (0.5388153673, -13.9530346327), (0, -12.6522192655))
            Line((0, -12.6522192655), (0, -14.49185))
            Line((0, -14.49185), (1.8396307345, -14.49185))
        make_face()
    revolve(axis=Axis((0, 0, 0), (0, 0, 1)), revolution_arc=F3_T81_ANGLE)


with BuildPart() as f3_tool82:
    # F3_s83 → F3_t84 (revolve)
    with BuildSketch(Plane.XZ.offset(25.4837)):
        with BuildLine():
            ThreePointArc((10.99185, 1.8396307345), (11.5306653673, 0.5388153673), (12.8314807345, 0))
            Line((12.8314807345, 0), (10.99185, 0))
            Line((10.99185, 0), (10.99185, 1.8396307345))
        make_face()
    revolve(axis=Axis((0, -25.4837, 0), (0, 0, 1)))


with BuildPart() as f3_tool85:
    # F3_s86 → F3_t87 (revolve)
    with BuildSketch(Plane.XZ):
        with BuildLine():
            ThreePointArc((10.99185, 1.8396307345), (11.5306653673, 0.5388153673), (12.8314807345, 0))
            Line((12.8314807345, 0), (10.99185, 0))
            Line((10.99185, 0), (10.99185, 1.8396307345))
        make_face()
    revolve(axis=Axis((0, 0, 0), (0, 0, 1)))


with BuildPart() as f3_tool88:
    # F3_s89 → F3_t90 (revolve)
    with BuildSketch(Plane.XZ.offset(-25.4837)):
        with BuildLine():
            ThreePointArc((10.99185, 1.8396307345), (11.5306653673, 0.5388153673), (12.8314807345, 0))
            Line((12.8314807345, 0), (10.99185, 0))
            Line((10.99185, 0), (10.99185, 1.8396307345))
        make_face()
    revolve(axis=Axis((0, 25.4837, 0), (0, 0, 1)))


with BuildPart() as f2_1:
    add(f2.part)

    # F3_t91: cut F3_tool1, F3_tool4, F3_tool7, F3_tool10, F3_tool13, F3_tool16, F3_tool19, F3_tool22, F3_tool25, F3_tool28, F3_tool31, F3_tool34, F3_tool37, F3_tool40, F3_tool43, F3_tool46, F3_tool49, F3_tool52, F3_tool55, F3_tool58, F3_tool61, F3_tool64, F3_tool67, F3_tool70, F3_tool73, F3_tool76, F3_tool79, F3_tool82, F3_tool85, F3_tool88
    add([f3_tool1.part, f3_tool4.part, f3_tool7.part, f3_tool10.part, f3_tool13.part, f3_tool16.part, f3_tool19.part, f3_tool22.part, f3_tool25.part, f3_tool28.part, f3_tool31.part, f3_tool34.part, f3_tool37.part, f3_tool40.part, f3_tool43.part, f3_tool46.part, f3_tool49.part, f3_tool52.part, f3_tool55.part, f3_tool58.part, f3_tool61.part, f3_tool64.part, f3_tool67.part, f3_tool70.part, f3_tool73.part, f3_tool76.part, f3_tool79.part, f3_tool82.part, f3_tool85.part, f3_tool88.part], mode=Mode.SUBTRACT)


solid = f2_1.part
